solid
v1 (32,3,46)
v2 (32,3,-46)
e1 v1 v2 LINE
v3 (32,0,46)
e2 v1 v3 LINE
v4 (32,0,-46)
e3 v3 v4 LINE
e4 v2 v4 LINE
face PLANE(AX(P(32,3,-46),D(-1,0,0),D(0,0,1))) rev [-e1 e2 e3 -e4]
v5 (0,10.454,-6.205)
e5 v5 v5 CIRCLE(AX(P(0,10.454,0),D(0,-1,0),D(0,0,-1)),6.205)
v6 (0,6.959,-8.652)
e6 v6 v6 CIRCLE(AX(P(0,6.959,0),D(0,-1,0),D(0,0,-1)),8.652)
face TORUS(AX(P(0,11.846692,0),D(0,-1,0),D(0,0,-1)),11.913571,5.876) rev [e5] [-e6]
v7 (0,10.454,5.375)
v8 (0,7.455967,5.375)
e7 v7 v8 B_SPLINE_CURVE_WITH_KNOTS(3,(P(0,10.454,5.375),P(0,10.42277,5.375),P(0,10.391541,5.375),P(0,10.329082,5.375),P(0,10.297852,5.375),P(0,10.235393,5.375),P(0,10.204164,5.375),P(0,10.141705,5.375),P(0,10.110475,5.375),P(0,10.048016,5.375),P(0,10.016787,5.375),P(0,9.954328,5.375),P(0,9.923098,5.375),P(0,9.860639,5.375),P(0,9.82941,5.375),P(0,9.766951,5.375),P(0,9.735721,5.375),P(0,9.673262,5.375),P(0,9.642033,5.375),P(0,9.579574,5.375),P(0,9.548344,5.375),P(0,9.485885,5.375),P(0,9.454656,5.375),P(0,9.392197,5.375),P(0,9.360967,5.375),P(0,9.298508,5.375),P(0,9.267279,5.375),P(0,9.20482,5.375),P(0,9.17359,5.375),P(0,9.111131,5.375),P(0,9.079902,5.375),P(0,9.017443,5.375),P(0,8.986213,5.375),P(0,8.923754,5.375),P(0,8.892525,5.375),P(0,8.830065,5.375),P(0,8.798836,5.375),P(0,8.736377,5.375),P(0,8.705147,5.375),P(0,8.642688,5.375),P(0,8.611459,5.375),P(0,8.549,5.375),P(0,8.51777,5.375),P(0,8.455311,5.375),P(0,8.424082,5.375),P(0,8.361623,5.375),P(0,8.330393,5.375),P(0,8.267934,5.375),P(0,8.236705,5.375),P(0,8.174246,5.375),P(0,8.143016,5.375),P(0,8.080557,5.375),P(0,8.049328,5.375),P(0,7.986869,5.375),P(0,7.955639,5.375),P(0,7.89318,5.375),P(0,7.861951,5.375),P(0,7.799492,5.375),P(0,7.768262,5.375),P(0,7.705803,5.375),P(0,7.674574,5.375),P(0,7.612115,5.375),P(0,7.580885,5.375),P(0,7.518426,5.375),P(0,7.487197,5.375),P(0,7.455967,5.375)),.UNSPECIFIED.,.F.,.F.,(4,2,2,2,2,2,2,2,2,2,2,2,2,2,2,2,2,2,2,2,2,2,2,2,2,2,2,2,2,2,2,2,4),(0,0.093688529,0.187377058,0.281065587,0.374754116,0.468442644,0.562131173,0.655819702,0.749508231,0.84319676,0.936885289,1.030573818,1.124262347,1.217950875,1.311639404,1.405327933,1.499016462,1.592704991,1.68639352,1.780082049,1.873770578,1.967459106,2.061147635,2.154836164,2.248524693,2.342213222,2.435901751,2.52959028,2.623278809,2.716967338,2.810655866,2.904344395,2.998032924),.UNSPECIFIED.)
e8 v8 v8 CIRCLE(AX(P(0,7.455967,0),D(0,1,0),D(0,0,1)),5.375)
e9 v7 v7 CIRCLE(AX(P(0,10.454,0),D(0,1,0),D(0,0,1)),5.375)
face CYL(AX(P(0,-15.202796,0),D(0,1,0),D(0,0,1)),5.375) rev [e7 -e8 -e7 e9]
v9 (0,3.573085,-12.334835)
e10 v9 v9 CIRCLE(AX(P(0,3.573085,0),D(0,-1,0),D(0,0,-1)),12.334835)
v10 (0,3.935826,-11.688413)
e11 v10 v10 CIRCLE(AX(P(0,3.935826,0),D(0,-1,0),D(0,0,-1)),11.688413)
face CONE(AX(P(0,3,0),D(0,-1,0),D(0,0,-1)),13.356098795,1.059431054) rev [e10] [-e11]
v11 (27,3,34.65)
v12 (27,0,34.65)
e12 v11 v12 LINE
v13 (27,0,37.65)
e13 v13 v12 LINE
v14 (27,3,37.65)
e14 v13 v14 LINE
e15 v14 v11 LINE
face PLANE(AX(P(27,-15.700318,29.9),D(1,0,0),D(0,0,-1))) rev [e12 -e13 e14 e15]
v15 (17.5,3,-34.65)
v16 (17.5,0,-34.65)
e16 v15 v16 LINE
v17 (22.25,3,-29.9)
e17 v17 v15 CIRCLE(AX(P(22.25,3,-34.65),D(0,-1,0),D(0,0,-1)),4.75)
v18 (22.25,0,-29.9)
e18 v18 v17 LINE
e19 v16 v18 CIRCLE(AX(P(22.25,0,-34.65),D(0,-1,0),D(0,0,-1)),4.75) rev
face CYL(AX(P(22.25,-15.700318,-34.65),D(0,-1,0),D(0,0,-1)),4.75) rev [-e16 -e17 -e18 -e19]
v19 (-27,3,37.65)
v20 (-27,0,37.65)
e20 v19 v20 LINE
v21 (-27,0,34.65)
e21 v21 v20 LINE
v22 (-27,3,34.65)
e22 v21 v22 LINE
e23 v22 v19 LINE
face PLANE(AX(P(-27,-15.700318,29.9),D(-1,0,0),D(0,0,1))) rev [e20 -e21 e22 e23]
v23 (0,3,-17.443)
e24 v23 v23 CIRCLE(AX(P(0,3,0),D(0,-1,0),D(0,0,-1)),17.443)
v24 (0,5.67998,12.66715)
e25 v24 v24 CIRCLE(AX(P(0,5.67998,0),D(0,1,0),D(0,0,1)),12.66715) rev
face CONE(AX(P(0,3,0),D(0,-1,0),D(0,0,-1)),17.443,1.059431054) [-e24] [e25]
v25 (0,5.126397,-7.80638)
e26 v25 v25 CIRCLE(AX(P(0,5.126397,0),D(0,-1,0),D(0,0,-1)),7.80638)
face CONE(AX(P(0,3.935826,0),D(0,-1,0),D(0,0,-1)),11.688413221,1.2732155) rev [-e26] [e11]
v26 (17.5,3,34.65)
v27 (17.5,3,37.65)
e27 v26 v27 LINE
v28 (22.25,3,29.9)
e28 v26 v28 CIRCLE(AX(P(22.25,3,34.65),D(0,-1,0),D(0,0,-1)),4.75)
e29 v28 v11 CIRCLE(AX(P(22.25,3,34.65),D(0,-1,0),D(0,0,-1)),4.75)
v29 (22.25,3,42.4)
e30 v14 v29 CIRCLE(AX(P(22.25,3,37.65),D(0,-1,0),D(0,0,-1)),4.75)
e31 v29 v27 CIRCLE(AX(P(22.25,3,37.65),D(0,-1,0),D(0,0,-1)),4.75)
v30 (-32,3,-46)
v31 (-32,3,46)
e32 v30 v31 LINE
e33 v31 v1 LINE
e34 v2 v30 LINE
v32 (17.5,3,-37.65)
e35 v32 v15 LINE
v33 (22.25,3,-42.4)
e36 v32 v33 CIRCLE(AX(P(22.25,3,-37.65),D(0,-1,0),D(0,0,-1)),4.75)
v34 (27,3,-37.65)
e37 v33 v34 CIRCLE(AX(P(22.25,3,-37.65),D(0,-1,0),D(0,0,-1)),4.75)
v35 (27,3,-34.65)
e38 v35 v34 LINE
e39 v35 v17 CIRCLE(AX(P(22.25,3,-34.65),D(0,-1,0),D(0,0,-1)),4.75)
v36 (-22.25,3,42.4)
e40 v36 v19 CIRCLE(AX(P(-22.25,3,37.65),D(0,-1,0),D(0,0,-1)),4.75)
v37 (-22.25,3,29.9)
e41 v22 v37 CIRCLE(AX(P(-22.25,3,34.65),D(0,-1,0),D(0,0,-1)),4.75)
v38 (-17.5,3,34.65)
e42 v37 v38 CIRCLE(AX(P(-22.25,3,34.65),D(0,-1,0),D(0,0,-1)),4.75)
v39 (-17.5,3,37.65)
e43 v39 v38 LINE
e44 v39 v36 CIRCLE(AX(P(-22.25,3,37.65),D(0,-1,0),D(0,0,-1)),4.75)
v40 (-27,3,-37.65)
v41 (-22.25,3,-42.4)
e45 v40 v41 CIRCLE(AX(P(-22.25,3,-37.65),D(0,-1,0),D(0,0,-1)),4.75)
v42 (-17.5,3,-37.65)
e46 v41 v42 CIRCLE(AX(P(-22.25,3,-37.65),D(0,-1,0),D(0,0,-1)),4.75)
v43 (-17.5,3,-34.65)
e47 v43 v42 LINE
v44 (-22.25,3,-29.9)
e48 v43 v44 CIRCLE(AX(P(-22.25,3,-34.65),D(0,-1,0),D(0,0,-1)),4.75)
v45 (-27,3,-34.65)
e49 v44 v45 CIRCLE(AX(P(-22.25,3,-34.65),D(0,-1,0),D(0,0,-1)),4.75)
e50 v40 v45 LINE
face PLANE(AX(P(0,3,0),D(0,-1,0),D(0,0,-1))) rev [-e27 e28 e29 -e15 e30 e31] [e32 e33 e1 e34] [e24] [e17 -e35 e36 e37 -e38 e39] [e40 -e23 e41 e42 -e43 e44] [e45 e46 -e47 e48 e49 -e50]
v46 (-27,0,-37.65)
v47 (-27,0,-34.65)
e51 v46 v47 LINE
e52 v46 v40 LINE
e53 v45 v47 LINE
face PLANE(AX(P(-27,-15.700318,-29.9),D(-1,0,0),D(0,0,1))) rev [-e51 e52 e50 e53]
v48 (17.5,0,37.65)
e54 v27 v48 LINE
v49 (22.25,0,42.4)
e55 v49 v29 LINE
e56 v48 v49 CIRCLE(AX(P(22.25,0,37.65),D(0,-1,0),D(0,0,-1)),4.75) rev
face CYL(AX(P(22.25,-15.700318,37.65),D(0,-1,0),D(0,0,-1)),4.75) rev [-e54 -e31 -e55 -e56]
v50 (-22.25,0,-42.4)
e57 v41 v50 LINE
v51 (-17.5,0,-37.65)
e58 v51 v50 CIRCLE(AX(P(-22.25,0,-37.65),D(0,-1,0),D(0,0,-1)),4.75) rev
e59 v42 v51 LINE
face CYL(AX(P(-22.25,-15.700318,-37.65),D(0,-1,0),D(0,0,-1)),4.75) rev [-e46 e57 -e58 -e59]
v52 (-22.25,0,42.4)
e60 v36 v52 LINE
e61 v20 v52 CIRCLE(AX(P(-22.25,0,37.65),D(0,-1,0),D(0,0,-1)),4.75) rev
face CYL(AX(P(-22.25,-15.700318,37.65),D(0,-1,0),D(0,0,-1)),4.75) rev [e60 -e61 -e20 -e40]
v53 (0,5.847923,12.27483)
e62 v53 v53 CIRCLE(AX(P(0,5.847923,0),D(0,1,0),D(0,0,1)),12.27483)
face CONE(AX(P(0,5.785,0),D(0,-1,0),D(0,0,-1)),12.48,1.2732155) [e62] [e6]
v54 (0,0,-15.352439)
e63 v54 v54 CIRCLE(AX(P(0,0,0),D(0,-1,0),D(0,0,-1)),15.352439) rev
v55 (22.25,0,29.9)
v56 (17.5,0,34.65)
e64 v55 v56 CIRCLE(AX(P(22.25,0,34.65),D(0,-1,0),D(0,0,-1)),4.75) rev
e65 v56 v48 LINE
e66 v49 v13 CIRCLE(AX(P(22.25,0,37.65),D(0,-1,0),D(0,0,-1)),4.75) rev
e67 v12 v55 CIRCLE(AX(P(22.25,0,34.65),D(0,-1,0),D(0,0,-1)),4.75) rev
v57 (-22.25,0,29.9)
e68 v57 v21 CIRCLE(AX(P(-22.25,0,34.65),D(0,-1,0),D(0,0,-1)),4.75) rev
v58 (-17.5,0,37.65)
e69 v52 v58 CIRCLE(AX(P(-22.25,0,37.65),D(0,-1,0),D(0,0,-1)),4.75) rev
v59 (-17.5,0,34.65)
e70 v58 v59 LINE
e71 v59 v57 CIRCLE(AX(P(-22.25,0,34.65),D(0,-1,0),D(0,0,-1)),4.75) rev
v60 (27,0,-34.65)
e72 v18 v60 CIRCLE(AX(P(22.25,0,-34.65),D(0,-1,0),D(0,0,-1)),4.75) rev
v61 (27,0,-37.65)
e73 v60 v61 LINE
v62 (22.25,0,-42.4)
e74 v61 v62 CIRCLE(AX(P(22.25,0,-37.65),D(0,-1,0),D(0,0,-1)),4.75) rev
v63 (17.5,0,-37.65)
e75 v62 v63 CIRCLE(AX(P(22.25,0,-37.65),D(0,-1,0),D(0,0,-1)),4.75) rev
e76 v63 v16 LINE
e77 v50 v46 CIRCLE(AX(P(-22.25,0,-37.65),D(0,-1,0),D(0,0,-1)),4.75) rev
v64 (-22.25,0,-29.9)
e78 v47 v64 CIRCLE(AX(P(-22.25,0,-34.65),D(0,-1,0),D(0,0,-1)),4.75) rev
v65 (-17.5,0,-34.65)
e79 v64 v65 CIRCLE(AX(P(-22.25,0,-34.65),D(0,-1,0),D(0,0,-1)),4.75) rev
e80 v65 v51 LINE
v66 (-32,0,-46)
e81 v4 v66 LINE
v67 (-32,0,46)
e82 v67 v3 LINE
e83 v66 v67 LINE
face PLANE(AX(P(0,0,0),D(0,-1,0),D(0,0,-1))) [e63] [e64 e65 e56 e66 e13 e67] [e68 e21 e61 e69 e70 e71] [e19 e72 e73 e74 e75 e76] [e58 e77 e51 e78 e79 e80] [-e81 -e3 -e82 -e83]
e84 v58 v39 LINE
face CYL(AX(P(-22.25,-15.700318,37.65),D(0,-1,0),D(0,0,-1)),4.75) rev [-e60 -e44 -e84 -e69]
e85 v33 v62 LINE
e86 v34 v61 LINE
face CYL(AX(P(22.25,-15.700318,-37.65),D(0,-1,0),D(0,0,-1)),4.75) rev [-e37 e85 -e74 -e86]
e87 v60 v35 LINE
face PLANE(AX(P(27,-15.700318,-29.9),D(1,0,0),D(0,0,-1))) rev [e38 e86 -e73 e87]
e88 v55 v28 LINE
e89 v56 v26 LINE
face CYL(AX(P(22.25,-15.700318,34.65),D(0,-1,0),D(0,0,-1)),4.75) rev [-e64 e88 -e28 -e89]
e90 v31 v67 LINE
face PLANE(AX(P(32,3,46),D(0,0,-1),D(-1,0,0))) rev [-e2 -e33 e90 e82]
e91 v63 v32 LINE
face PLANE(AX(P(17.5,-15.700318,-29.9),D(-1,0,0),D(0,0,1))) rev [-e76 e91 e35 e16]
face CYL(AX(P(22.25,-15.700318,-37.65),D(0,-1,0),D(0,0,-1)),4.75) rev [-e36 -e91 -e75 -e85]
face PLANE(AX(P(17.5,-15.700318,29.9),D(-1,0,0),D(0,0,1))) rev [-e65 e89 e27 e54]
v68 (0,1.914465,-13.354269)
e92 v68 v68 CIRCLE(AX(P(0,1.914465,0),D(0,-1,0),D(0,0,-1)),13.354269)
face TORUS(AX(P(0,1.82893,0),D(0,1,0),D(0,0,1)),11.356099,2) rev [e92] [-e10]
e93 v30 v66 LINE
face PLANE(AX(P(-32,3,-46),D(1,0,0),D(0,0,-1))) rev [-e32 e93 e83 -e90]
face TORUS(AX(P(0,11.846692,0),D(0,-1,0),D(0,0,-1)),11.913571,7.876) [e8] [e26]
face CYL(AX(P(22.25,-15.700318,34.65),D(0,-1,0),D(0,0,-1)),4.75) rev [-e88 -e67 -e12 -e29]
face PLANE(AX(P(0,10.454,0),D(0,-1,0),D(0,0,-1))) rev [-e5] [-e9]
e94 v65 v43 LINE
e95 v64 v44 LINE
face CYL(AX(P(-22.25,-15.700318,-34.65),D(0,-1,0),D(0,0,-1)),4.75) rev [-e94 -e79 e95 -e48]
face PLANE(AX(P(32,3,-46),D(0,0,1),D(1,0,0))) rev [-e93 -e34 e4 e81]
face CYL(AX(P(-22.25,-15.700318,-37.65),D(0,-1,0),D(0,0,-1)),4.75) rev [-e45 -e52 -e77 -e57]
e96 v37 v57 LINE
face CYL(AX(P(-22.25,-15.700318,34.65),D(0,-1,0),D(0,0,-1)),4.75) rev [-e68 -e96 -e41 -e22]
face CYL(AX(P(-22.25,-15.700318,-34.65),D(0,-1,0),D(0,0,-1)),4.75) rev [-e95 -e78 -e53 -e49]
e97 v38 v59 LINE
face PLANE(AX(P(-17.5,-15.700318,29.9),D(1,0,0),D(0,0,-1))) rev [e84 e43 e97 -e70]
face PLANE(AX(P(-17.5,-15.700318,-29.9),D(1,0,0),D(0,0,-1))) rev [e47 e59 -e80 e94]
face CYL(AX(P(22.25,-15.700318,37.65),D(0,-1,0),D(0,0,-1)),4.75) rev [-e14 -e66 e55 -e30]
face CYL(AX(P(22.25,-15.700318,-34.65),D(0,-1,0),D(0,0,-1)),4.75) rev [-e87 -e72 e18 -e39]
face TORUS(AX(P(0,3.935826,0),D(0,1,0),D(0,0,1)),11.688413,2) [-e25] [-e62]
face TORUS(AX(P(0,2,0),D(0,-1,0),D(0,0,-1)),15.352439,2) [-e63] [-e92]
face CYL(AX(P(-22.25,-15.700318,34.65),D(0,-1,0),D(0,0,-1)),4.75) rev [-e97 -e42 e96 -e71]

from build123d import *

# Parameters (mm, degrees)
SKETCH1_W           = 64
SKETCH1_H           = 92
BOSS_EXTRUDE1_DEPTH = 3
SKETCH2_W           = 9.5
SKETCH2_H           = 12.5
CUT_EXTRUDE1_DEPTH  = 3
FILLET1_R           = 4.75
FILLET2_R           = 2
CUT_EXTRUDE2_START  = -10.454
SKETCH6_R           = 5.375
CUT_EXTRUDE2_DEPTH  = 10.454
SKETCH8_R           = 13.356098795
CUT_EXTRUDE3_DEPTH  = 3
FILLET3_R           = 2
FILLET4_R           = 2


# Some blends are built 0.0001 mm under size
with BuildPart() as part:
    # Sketch1 → Boss-Extrude1 (new body)
    with BuildSketch(Plane(origin=(0, 0, 0), x_dir=(1, 0, 0), z_dir=(0, 1, 0))):
        Rectangle(SKETCH1_W, SKETCH1_H)
    extrude(amount=BOSS_EXTRUDE1_DEPTH)

    # Sketch2 → Cut-Extrude1 (cut)
    with BuildSketch(Plane(origin=(0, 3, 0), x_dir=(1, 0, 0), z_dir=(0, 1, 0))):
        with Locations((22.25, 36.15)):
            Rectangle(SKETCH2_W, SKETCH2_H)
        with Locations((-22.25, 36.15)):
            Rectangle(SKETCH2_W, SKETCH2_H)
        with Locations((22.25, -36.15)):
            Rectangle(SKETCH2_W, SKETCH2_H)
        with Locations((-22.25, -36.15)):
            Rectangle(SKETCH2_W, SKETCH2_H)
    extrude(amount=-CUT_EXTRUDE1_DEPTH, mode=Mode.SUBTRACT)

    # Fillet1
    fillet1_edges = [part.edges().sort_by_distance(p)[0] for p in [
        (27, 1.5, 42.4),
        (17.5, 1.5, 42.4),
        (17.5, 1.5, 29.9),
        (27, 1.5, 29.9),
        (-27, 1.5, 42.4),
        (-17.5, 1.5, 42.4),
        (-17.5, 1.5, 29.9),
        (-27, 1.5, 29.9),
        (27, 1.5, -29.9),
        (17.5, 1.5, -29.9),
        (27, 1.5, -42.4),
        (17.5, 1.5, -42.4),
        (-17.5, 1.5, -29.9),
        (-27, 1.5, -29.9),
        (-17.5, 1.5, -42.4),
        (-27, 1.5, -42.4),
    ]]
    fillet(fillet1_edges, radius=FILLET1_R - 0.0001)  # a hair under: the kernel refuses the full size

    # Sketch5 → Revolve1 (revolve)
    with BuildSketch(Plane(origin=(0, 0, 0), x_dir=(0, 0, -1), z_dir=(1, 0, 0))):
        with BuildLine():
            Line((17.443, 3), (12.48, 5.785))
            Line((12.48, 5.785), (8.652, 6.959))
            ThreePointArc((8.652, 6.959), (7.100088069, 8.476564665), (6.205, 10.454))
            Line((6.205, 10.454), (0, 10.454))
            Line((0, 10.454), (0, 3))
            Line((0, 3), (2, 3))
            Line((2, 3), (2, 8.454))
            Line((2, 8.454), (4.805757283, 8.454))
            ThreePointArc((4.805757283, 8.454), (6.064441281, 6.572314424), (7.806379809, 5.126397352))
            Line((7.806379809, 5.126397352), (11.688413221, 3.935825977))
            Line((11.688413221, 3.935825977), (13.356098795, 3))
            Line((13.356098795, 3), (17.443, 3))
        make_face()
    revolve(axis=Axis((0, -11.842752106, 0), (0, 1, 0)))

    # Fillet2
    fillet2_edges = [part.edges().sort_by_distance(p)[0] for p in [
        (0, 5.785, 12.48),
    ]]
    fillet(fillet2_edges, radius=FILLET2_R)

    # Sketch6 → Cut-Extrude2 (cut)
    with BuildSketch(Plane(origin=(0, 10.454, 0), x_dir=(1, 0, 0), z_dir=(0, 1, 0)).offset(CUT_EXTRUDE2_START)):
        with Locations(Location((0, 0, 0), (0, 0, 270))):
            Circle(SKETCH6_R)
    extrude(amount=CUT_EXTRUDE2_DEPTH, mode=Mode.SUBTRACT)

    # Sketch8 → Cut-Extrude3 (cut)
    with BuildSketch(Plane(origin=(0, 0, 0), x_dir=(-1, 0, 0), z_dir=(0, -1, 0))):
        with Locations(Location((0, 0, 0), (0, 0, 90))):
            Circle(SKETCH8_R)
    extrude(amount=-CUT_EXTRUDE3_DEPTH, mode=Mode.SUBTRACT)

    # Fillet3
    fillet3_edges = [part.edges().sort_by_distance(p)[0] for p in [
        (0, 3, 13.356098795),
    ]]
    fillet(fillet3_edges, radius=FILLET3_R)

    # Fillet4
    # the kernel refuses this fillet: 2 mm, written as the material it takes off along each edge
    with BuildSketch(Plane(origin=(0, 0, 0), x_dir=(0, 0, -1), z_dir=(-1, 0, 0))) as fillet4_piece_1:
        with BuildLine():
            CenterArc((15.352435599, -2), FILLET4_R, 90, 87.54885706)
            Line((15.352435599, 0), (15.352435599, 0.2))
            Line((15.352435599, 0.2), (13.356098795, 0.2))
            Line((13.356098795, 0.2), (13.156098795, 0))
            ThreePointArc((13.156098795, 0), (13.156095386, -1.828930112), (13.154448481, -1.905911573))
            Line((13.154448481, -1.905911573), (13.354265492, -1.914465067))
        make_face()
    revolve(axis=Axis((0, 0, 0), (0, -1, 0)), mode=Mode.SUBTRACT)


solid = part.part
